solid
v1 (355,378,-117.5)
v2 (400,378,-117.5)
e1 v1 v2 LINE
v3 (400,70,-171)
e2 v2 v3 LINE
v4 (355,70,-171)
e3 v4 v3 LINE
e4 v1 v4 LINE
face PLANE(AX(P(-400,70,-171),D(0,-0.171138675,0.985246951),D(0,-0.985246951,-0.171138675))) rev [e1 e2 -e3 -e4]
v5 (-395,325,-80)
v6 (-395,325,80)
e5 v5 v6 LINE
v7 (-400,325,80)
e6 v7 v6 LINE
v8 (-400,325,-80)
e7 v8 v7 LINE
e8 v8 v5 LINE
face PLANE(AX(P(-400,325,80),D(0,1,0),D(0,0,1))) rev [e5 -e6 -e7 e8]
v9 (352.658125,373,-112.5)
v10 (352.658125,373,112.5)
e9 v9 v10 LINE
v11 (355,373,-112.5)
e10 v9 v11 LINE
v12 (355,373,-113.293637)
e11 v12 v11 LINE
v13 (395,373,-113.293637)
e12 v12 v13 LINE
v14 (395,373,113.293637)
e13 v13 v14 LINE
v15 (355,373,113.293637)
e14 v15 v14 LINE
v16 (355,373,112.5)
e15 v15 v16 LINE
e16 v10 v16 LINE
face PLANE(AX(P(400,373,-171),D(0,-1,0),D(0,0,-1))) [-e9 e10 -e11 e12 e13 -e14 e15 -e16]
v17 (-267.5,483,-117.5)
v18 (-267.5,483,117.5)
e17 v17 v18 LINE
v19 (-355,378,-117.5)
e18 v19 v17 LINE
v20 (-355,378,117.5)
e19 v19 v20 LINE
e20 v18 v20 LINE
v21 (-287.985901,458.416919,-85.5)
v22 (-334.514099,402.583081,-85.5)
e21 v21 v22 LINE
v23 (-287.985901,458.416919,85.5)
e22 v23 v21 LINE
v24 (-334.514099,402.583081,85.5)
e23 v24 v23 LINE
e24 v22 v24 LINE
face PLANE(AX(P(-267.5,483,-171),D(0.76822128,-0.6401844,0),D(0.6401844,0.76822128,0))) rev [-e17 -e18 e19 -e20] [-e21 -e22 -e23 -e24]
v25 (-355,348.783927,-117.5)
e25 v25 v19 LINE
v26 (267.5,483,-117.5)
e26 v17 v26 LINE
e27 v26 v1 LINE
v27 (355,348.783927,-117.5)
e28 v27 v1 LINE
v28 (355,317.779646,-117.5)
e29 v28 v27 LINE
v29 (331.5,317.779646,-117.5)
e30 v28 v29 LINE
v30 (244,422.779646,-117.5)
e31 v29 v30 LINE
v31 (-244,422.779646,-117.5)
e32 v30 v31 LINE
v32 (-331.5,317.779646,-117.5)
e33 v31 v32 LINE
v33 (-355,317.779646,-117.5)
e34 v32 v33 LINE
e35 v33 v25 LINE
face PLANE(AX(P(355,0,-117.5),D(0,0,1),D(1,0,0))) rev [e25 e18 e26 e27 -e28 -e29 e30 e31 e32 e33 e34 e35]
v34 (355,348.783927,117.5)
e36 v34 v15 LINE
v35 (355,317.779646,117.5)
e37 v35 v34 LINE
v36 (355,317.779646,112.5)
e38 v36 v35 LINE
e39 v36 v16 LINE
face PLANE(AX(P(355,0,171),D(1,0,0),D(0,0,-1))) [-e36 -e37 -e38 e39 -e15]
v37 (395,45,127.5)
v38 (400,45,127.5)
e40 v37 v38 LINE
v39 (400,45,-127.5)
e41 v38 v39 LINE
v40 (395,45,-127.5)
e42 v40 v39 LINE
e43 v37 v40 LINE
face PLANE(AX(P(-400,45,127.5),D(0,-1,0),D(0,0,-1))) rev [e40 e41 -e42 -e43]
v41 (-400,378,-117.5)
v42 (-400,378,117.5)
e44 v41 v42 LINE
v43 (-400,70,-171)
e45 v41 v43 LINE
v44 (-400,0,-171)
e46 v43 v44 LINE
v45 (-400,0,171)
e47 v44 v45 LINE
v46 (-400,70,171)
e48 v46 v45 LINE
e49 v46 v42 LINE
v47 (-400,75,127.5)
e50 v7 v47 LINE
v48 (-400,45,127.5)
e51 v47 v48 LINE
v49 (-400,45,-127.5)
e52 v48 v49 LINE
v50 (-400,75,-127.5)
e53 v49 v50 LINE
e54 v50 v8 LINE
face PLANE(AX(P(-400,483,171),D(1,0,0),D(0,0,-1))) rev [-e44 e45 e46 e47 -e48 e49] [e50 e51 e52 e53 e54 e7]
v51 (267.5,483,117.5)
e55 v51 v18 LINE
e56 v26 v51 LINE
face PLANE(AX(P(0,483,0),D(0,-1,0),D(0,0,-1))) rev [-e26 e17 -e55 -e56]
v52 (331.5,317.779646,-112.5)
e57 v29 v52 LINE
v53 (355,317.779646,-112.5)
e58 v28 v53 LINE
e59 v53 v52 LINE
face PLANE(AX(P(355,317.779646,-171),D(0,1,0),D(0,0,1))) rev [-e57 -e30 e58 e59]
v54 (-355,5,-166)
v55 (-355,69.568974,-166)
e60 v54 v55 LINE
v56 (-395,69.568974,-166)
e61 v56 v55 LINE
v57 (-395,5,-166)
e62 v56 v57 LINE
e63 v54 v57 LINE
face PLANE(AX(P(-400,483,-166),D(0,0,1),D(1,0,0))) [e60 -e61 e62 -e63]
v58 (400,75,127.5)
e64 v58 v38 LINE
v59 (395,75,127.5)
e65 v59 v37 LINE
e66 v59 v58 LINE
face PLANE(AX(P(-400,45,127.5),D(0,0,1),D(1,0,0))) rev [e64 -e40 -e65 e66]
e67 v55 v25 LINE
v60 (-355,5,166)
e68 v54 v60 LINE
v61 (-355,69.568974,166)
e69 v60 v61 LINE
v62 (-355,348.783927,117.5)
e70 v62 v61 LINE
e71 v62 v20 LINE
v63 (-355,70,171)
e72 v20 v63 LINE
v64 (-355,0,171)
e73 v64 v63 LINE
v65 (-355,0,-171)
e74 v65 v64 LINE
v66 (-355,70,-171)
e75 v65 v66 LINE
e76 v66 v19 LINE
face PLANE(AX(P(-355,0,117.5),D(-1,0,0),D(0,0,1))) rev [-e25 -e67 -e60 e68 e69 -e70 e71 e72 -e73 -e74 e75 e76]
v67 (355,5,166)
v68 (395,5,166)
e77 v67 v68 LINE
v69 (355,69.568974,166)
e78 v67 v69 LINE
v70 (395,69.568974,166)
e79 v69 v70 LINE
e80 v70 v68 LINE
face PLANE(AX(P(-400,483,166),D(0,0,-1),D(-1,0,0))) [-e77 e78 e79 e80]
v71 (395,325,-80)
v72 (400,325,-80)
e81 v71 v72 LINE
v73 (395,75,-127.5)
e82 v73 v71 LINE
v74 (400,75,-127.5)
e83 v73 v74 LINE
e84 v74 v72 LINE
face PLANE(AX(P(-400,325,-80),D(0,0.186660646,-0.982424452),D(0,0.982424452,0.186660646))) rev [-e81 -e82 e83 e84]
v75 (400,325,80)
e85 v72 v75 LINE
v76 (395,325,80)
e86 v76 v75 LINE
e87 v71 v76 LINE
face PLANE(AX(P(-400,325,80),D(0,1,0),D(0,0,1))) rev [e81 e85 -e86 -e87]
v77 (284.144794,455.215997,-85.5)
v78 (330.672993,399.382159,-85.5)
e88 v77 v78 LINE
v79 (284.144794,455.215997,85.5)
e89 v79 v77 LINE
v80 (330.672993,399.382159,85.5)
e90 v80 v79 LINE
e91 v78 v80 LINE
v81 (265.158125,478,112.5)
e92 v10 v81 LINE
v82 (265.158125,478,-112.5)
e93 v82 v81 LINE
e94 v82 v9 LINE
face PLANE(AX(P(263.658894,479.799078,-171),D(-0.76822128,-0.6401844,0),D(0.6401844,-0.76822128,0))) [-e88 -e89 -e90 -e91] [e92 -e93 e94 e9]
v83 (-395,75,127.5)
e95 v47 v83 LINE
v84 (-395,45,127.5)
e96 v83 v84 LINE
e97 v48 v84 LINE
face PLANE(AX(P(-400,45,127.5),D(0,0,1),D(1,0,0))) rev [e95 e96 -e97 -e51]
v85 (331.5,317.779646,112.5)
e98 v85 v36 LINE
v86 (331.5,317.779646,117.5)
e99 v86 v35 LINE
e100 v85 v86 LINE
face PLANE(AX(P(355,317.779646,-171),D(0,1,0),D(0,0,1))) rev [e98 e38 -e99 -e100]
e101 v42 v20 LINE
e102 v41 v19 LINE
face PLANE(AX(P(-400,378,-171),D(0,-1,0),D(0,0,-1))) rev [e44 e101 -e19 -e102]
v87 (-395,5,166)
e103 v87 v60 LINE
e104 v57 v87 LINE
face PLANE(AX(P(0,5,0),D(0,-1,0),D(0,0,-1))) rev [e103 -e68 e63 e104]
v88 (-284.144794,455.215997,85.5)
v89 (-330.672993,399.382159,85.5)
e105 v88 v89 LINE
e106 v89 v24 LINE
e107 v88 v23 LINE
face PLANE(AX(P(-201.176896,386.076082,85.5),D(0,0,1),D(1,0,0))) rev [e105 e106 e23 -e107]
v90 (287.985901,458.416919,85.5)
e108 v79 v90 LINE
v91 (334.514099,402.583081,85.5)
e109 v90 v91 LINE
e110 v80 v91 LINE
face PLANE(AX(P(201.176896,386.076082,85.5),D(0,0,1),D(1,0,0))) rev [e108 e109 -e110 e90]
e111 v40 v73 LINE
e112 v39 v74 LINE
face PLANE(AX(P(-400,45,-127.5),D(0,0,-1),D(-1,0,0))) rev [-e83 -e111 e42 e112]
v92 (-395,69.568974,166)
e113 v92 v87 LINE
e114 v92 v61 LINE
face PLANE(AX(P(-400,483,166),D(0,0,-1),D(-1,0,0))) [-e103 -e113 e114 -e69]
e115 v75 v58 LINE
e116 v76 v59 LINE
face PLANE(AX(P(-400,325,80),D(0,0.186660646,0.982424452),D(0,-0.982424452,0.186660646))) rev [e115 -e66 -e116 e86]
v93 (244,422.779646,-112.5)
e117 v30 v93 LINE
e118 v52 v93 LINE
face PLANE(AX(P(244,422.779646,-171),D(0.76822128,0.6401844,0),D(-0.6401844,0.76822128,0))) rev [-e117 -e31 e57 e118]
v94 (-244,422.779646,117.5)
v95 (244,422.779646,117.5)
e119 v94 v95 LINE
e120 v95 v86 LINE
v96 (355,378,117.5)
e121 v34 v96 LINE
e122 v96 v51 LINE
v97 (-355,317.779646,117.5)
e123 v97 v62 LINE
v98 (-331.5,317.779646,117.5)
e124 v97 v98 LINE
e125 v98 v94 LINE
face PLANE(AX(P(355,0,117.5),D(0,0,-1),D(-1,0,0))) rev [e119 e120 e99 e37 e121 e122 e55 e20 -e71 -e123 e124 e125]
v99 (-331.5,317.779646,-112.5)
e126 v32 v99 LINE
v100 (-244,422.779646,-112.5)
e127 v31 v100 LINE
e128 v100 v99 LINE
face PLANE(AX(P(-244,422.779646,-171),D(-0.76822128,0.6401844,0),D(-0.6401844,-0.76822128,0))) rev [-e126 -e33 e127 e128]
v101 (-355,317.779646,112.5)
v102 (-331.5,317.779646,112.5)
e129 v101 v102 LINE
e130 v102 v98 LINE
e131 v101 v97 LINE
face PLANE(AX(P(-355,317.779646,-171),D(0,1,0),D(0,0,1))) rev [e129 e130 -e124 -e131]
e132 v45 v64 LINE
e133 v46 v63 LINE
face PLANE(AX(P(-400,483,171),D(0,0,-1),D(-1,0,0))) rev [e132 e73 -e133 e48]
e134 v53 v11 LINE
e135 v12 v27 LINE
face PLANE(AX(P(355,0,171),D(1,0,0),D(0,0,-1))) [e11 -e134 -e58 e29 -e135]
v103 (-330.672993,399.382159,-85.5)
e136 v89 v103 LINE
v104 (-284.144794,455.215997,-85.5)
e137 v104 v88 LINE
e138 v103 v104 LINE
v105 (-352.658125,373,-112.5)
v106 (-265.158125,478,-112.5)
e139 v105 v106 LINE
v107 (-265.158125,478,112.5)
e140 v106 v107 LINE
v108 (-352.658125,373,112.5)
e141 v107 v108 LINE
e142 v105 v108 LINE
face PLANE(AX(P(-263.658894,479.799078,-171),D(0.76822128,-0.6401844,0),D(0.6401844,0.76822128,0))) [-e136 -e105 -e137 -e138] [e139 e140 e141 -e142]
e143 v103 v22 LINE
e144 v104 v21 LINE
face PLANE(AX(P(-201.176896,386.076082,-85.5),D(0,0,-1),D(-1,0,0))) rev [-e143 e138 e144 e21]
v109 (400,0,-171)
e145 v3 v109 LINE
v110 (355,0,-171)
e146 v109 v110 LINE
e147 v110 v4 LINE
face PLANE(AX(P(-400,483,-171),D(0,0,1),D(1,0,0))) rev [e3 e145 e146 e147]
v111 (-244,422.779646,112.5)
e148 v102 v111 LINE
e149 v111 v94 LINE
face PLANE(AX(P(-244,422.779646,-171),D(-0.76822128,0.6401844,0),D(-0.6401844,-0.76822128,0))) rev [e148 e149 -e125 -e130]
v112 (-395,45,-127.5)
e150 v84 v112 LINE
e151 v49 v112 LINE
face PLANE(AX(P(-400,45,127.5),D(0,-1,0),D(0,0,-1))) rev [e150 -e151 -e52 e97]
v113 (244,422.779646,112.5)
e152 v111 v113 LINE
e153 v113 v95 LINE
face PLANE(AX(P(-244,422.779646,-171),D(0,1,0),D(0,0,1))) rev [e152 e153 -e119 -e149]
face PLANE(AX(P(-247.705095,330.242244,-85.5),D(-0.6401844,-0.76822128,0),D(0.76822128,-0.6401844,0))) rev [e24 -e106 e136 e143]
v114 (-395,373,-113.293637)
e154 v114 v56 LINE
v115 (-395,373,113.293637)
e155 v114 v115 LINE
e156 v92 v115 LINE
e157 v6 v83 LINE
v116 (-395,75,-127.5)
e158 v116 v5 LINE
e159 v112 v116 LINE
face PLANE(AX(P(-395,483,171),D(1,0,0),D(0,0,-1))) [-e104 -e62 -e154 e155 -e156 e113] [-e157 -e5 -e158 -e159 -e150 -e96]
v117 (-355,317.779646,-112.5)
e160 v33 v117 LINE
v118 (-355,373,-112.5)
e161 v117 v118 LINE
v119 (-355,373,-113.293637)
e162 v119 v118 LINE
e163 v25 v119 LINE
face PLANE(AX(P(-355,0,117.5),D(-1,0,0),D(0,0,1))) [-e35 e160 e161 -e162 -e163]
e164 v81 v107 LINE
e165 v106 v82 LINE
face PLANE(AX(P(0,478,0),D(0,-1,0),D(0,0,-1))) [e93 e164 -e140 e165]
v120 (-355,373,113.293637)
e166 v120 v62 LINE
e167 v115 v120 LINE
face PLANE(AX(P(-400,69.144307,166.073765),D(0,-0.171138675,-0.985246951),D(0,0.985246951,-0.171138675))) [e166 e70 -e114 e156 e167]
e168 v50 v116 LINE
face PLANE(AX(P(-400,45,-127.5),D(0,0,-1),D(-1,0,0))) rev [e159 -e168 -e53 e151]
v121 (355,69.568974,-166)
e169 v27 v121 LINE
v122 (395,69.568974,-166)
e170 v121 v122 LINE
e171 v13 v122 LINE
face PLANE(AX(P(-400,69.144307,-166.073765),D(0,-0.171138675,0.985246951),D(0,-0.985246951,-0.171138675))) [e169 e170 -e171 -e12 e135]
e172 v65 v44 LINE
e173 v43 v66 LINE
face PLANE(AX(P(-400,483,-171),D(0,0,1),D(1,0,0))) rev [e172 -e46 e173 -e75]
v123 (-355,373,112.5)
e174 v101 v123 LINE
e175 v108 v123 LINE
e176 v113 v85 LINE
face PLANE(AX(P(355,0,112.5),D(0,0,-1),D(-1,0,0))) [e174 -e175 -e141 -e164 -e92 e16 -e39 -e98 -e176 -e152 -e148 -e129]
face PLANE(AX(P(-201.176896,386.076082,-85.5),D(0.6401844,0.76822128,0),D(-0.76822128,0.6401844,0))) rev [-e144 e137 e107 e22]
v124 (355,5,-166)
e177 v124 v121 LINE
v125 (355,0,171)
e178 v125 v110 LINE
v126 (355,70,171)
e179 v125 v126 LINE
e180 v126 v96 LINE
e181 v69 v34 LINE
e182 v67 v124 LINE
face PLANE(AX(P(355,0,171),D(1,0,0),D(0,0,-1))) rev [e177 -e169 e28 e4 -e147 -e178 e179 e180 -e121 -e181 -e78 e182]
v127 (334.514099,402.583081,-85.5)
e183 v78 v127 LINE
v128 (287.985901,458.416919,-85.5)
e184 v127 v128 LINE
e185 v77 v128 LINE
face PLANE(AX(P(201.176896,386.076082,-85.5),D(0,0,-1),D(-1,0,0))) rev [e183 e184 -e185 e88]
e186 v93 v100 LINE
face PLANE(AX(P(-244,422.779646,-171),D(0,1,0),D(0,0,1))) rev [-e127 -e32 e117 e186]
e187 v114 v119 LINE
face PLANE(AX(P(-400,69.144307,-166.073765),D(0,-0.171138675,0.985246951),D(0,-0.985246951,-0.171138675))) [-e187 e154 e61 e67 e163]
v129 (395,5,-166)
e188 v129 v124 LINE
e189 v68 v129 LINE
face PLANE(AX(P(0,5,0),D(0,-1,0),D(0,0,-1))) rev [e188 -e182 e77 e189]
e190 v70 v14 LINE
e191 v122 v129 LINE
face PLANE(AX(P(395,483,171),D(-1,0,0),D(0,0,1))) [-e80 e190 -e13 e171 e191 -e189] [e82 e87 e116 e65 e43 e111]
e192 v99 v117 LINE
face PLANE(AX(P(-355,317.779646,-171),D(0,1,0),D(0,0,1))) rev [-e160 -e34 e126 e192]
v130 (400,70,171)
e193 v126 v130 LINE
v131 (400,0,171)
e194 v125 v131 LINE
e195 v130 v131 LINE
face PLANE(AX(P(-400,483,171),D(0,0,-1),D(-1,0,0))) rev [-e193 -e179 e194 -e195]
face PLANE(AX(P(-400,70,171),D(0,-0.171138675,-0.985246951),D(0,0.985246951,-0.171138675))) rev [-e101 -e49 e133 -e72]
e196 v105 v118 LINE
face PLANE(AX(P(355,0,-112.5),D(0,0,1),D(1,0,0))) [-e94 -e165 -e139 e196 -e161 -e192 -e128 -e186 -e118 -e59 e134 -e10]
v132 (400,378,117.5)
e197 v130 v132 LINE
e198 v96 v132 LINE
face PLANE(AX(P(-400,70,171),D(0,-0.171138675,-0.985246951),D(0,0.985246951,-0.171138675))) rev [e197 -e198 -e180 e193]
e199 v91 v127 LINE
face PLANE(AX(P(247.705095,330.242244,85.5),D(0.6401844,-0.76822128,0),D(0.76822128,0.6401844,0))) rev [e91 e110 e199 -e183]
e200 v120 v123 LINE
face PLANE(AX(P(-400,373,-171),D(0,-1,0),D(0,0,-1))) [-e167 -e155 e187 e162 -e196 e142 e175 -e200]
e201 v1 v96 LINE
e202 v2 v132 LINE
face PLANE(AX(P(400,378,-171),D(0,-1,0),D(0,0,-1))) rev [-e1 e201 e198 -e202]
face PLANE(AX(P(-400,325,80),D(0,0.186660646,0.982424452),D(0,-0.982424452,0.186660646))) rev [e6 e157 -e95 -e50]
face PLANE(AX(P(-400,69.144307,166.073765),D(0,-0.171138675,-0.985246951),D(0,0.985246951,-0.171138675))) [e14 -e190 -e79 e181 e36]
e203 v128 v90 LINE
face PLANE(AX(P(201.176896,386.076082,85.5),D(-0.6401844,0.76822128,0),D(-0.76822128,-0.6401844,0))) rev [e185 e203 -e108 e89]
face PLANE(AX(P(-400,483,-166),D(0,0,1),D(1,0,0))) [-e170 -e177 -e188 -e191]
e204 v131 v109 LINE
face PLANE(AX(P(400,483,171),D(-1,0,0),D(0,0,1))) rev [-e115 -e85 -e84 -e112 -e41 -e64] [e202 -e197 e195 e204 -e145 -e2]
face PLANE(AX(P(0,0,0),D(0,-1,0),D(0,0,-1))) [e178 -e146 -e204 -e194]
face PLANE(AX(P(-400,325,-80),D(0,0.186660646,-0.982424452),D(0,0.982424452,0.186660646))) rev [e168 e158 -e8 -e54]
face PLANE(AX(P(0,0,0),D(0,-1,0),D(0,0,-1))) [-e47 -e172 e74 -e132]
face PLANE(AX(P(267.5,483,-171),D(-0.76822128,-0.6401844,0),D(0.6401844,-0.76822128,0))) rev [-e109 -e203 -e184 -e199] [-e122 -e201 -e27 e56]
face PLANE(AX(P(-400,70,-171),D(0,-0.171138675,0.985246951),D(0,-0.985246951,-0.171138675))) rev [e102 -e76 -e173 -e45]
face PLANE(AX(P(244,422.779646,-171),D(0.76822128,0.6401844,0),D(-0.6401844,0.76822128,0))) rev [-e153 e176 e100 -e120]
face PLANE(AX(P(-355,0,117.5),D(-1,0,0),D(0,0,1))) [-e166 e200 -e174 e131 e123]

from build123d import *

# Parameters (mm, degrees)
CROQUIS1_W              = 800
CROQUIS1_H              = 342
SALIENTE_EXTRUIR1_DEPTH = 483
CROQUIS2_W              = 710
CROQUIS2_H              = 53.5
CORTAR_EXTRUIR1_DEPTH   = 483
CORTAR_EXTRUIR2_DEPTH   = 342
CORTAR_EXTRUIR4_DEPTH   = 800
VACIADO2_START          = -265.15812527
VACIADO2_OUTLINE_W      = 105
VACIADO2_OUTLINE_H      = 225
VACIADO2_DEPTH          = 530.31625054
VACIADO2_START_2        = -395
VACIADO2_2_DEPTH        = 790
VACIADO2_3_DEPTH        = 40
VACIADO2_START_3        = 355
VACIADO2_4_DEPTH        = 40
VACIADO2_START_4        = -112.5
VACIADO2_5_DEPTH        = 225
CROQUIS8_W              = 171
CROQUIS8_H              = 72.679369328
CORTAR_EXTRUIR7_DEPTH   = 113
CROQUIS9_W              = 171
CROQUIS9_H              = 72.679369328
CORTAR_EXTRUIR8_DEPTH   = 113


with BuildPart() as part:
    # Croquis1 → Saliente-Extruir1 (new body)
    with BuildSketch(Plane(origin=(0, 0, 0), x_dir=(1, 0, 0), z_dir=(0, 1, 0))):
        Rectangle(CROQUIS1_W, CROQUIS1_H)
    extrude(amount=SALIENTE_EXTRUIR1_DEPTH)

    # Croquis2 → Cortar-Extruir1 (cut)
    with BuildSketch(Plane(origin=(0, 483, 0), x_dir=(1, 0, 0), z_dir=(0, 1, 0))):
        with Locations((0, 144.25)):
            Rectangle(CROQUIS2_W, CROQUIS2_H)
        with Locations((0, -144.25)):
            Rectangle(CROQUIS2_W, CROQUIS2_H)
    extrude(amount=-CORTAR_EXTRUIR1_DEPTH, mode=Mode.SUBTRACT)

    # Croquis3 → Cortar-Extruir2 (cut)
    with BuildSketch(Plane.XY.offset(171)):
        Polygon((-355, 317.779645743), (-355, 0), (355, 0), (355, 317.779645743), (331.5, 317.779645743), (244, 422.779645743), (-244, 422.779645743), (-331.5, 317.779645743), align=None)
        Polygon((267.5, 483), (355, 378), (400, 378), (400, 483), align=None)
        Polygon((-400, 483), (-400, 378), (-355, 378), (-267.5, 483), align=None)
    extrude(amount=-CORTAR_EXTRUIR2_DEPTH, mode=Mode.SUBTRACT)

    # Croquis4 → Cortar-Extruir4 (cut)
    with BuildSketch(Plane(origin=(400, 0, 0), x_dir=(0, 0, -1), z_dir=(1, 0, 0))):
        Polygon((171, 378), (171, 70), (117.5, 378), align=None)
        Polygon((-171, 70), (-117.5, 378), (-171, 378), align=None)
        Polygon((-127.5, 45), (127.5, 45), (127.5, 75), (80, 325), (-80, 325), (-127.5, 75), align=None)
    extrude(amount=-CORTAR_EXTRUIR4_DEPTH, mode=Mode.SUBTRACT)

    # Vaciado2: read off the stored shape, not the designer's step
    # Vaciado2 outline → Vaciado2 (cut)
    with BuildSketch(Plane.YZ.offset(VACIADO2_START)):
        with Locations((425.5, 0)):
            Rectangle(VACIADO2_OUTLINE_W, VACIADO2_OUTLINE_H)
    extrude(amount=VACIADO2_DEPTH, mode=Mode.SUBTRACT)

    # Vaciado2 2 outline → Vaciado2 2 (cut)
    with BuildSketch(Plane.YZ.offset(VACIADO2_START_2)):
        Polygon((373, -112.5), (373, 112.5), (317.779645743, 112.5), (317.779645743, 81.371867309), (325, 80), (325, -80), (317.779645743, -81.371867309), (317.779645743, -112.5), align=None)
    extrude(amount=VACIADO2_2_DEPTH, mode=Mode.SUBTRACT)

    # Vaciado2 3 outline → Vaciado2 3 (cut)
    with BuildSketch(Plane.YZ.offset(VACIADO2_START_2)):
        Polygon((69.568973838, 166), (5, 166), (5, -166), (69.568973838, -166), (373, -113.293636689), (373, -112.5), (317.779645743, -112.5), (317.779645743, -81.371867309), (75, -127.5), (45, -127.5), (45, 127.5), (75, 127.5), (317.779645743, 81.371867309), (317.779645743, 112.5), (373, 112.5), (373, 113.293636689), align=None)
    extrude(amount=VACIADO2_3_DEPTH, mode=Mode.SUBTRACT)

    # Vaciado2 4 outline → Vaciado2 4 (cut)
    with BuildSketch(Plane.YZ.offset(VACIADO2_START_3)):
        Polygon((69.568973838, 166), (5, 166), (5, -166), (69.568973838, -166), (373, -113.293636689), (373, -112.5), (317.779645743, -112.5), (317.779645743, -81.371867309), (75, -127.5), (45, -127.5), (45, 127.5), (75, 127.5), (317.779645743, 81.371867309), (317.779645743, 112.5), (373, 112.5), (373, 113.293636689), align=None)
    extrude(amount=VACIADO2_4_DEPTH, mode=Mode.SUBTRACT)

    # Vaciado2 5 outline → Vaciado2 5 (cut)
    with BuildSketch(Plane.XY.offset(VACIADO2_START_4)):
        Polygon((352.65812527, 373), (265.15812527, 478), (265.15812527, 397.389895419), (285.483038119, 373), align=None)
        Polygon((-265.15812527, 478), (-352.65812527, 373), (-285.483038119, 373), (-265.15812527, 397.389895419), align=None)
    extrude(amount=VACIADO2_5_DEPTH, mode=Mode.SUBTRACT)

    # Croquis8 → Cortar-Extruir7 (cut)
    with BuildSketch(Plane(origin=(395.409836066, 329.508196721, 0), x_dir=(0, 0, -1), z_dir=(0.7682212795973777, 0.6401843996644778, 0))):
        with Locations((0, 131.461866471)):
            Rectangle(CROQUIS8_W, CROQUIS8_H)
    extrude(amount=-CORTAR_EXTRUIR7_DEPTH, mode=Mode.SUBTRACT)

    # Croquis9 → Cortar-Extruir8 (cut)
    with BuildSketch(Plane(origin=(-395.409836066, 329.508196721, 0), x_dir=(0, 0, 1), z_dir=(-0.7682212795973777, 0.6401843996644778, 0))):
        with Locations((0, 131.461866471)):
            Rectangle(CROQUIS9_W, CROQUIS9_H)
    extrude(amount=-CORTAR_EXTRUIR8_DEPTH, mode=Mode.SUBTRACT)


solid = part.part
